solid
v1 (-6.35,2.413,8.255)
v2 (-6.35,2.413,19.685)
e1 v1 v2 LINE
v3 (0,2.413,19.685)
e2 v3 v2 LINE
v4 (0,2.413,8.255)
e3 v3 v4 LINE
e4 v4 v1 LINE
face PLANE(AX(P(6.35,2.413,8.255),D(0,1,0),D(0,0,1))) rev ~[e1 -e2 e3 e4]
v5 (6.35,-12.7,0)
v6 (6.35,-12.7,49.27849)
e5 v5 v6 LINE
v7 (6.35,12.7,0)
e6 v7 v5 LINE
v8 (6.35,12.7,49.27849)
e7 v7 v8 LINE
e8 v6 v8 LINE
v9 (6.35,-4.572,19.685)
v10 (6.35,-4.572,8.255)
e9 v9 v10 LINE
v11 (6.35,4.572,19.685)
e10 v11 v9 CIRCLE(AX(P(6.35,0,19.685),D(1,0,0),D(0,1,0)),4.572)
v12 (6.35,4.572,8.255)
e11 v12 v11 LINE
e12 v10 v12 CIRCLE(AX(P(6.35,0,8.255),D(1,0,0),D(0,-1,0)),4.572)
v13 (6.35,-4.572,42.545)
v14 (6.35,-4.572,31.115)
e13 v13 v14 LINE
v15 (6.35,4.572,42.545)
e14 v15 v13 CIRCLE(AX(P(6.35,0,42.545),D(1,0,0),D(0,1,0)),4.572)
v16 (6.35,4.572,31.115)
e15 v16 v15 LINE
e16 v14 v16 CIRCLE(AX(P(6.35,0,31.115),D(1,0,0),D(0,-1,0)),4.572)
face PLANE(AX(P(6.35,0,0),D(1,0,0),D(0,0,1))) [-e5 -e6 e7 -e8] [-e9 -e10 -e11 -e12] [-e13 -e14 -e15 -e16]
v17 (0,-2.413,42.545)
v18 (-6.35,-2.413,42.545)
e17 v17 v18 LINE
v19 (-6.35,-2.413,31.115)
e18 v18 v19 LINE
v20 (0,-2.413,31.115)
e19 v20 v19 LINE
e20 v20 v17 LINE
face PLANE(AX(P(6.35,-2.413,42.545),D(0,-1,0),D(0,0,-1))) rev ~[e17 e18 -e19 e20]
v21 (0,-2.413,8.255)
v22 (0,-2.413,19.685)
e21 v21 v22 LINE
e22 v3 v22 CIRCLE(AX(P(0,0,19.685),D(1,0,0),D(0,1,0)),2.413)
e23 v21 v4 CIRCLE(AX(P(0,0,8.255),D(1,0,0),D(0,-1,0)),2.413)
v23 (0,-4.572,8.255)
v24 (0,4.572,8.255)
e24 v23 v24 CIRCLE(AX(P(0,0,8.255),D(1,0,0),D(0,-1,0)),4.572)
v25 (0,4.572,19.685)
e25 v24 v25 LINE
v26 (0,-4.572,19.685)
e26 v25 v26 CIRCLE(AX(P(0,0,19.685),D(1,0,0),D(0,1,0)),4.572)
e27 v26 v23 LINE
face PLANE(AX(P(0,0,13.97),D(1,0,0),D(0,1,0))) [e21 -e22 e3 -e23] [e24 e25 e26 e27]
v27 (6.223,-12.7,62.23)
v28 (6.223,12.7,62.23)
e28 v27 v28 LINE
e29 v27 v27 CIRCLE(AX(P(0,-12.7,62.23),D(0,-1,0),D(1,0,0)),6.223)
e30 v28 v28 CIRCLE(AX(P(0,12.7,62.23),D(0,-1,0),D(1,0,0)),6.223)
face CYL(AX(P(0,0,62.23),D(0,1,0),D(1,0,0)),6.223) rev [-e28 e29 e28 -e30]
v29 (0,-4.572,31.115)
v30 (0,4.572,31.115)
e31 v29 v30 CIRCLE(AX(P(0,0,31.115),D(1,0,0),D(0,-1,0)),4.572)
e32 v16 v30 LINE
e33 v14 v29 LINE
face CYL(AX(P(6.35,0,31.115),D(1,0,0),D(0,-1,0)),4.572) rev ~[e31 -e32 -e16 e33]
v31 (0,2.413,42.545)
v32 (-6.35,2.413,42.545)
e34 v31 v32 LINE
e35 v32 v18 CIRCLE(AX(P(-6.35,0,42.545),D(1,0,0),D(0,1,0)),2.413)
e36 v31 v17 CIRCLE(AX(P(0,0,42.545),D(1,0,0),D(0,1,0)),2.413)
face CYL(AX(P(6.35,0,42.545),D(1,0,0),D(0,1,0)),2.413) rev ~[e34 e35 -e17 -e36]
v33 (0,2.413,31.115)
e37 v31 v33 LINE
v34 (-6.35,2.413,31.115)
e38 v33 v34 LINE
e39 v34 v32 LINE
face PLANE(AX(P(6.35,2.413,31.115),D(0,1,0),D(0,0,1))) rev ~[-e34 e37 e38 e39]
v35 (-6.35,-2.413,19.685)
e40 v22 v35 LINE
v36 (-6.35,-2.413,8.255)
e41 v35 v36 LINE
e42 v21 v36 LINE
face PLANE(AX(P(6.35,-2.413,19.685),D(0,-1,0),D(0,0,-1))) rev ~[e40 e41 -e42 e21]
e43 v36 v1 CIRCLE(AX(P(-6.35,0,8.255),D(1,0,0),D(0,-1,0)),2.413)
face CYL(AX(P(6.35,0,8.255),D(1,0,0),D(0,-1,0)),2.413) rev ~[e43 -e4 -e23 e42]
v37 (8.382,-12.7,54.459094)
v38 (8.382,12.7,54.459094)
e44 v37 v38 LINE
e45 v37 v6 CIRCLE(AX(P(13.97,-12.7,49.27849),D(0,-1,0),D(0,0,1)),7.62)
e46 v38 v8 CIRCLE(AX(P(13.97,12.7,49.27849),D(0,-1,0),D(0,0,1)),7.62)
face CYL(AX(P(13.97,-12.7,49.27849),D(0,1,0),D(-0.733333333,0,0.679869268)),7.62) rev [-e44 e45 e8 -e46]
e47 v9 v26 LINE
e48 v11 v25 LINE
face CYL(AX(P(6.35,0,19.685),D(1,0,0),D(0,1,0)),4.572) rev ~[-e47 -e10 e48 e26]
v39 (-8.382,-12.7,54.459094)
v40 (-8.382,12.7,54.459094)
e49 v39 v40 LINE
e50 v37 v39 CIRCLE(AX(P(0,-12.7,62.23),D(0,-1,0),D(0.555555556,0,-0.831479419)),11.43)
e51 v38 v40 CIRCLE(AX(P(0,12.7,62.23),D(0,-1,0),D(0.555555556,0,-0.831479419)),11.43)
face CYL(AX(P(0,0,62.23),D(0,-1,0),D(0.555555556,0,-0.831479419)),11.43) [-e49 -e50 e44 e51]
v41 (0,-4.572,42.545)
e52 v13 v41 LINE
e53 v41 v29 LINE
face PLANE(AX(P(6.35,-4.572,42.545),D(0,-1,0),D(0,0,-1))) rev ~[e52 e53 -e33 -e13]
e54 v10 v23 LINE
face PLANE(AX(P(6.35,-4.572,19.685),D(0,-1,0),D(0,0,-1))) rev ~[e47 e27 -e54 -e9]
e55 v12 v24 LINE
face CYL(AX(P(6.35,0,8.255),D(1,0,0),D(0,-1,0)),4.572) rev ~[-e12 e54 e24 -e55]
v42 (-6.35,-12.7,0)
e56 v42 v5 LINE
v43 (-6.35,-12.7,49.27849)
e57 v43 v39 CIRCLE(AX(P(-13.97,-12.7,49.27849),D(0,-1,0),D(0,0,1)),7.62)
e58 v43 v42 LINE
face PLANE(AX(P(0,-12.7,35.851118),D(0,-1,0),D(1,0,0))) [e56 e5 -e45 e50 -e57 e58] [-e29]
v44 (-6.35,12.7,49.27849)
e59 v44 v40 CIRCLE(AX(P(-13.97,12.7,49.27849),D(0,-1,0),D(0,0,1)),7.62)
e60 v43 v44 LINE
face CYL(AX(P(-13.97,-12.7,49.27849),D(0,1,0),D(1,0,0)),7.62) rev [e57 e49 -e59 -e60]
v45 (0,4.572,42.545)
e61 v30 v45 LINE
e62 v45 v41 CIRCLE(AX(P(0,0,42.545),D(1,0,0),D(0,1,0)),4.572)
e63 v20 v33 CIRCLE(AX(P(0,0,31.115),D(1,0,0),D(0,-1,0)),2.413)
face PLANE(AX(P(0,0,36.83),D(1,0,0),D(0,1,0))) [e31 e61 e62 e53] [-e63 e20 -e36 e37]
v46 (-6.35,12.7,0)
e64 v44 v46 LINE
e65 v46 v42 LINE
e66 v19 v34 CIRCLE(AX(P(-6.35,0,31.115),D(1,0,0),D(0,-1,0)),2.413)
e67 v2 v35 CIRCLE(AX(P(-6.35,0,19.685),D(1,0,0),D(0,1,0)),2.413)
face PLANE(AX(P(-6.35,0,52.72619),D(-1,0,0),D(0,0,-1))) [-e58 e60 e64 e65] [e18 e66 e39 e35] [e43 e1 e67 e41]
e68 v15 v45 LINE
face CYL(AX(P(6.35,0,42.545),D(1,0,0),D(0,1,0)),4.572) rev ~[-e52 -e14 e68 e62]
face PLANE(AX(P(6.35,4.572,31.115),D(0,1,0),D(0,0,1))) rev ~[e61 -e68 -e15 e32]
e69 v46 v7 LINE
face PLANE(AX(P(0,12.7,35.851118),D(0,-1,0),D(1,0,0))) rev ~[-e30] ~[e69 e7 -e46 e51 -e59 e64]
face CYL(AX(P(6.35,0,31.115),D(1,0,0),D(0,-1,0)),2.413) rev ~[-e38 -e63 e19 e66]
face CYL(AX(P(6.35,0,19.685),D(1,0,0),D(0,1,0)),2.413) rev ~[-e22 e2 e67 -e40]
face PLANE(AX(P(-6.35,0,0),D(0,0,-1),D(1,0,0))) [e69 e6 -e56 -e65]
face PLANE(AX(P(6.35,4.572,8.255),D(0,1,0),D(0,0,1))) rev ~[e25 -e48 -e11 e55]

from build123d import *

# Parameters (mm, degrees)
F0_R          = 6.223
F1_DEPTH      = 12.7
F3_R          = 7.62
F2_R          = 2.413
F4_DEPTH      = 17.781
F6_DEPTH      = 17.781
F8_DEPTH      = 6.35
F8_DEPTH_BACK = 5.081


with BuildPart() as f1:
    # F0 (on Front) → F1 (new body, symmetric)
    with BuildSketch(Plane.XZ):
        with BuildLine():
            Line((-6.35, 52.7261902376), (-6.35, 0))
            Line((-6.35, 0), (6.35, 0))
            Line((6.35, 0), (6.35, 52.7261902376))
            ThreePointArc((6.35, 52.7261902376), (0, 73.66), (-6.35, 52.7261902376))
        make_face()
        with Locations((0, 62.23)):
            Circle(F0_R, mode=Mode.SUBTRACT)
    extrude(amount=F1_DEPTH, both=True)

    # F3
    f3_edges = [f1.edges().sort_by_distance(p)[0] for p in [
        (-6.35, 0, 52.72619),
        (6.35, 0, 52.72619),
    ]]
    fillet(f3_edges, radius=F3_R)

    # F2 (on face) → F4 (cut, through all)
    with BuildSketch(Plane.YZ.offset(6.35)):
        with Locations((0, 36.83)):
            Circle(F2_R)
        with Locations((0, 13.97)):
            Circle(F2_R)
    extrude(amount=-F4_DEPTH, mode=Mode.SUBTRACT)

    # F5 (on face) → F6 (cut, through all)
    with BuildSketch(Plane.YZ.offset(6.35)):
        with BuildLine():
            ThreePointArc((2.413, 42.545), (0, 44.958), (-2.413, 42.545))
            Line((-2.413, 42.545), (-2.413, 31.115))
            ThreePointArc((-2.413, 31.115), (0, 28.702), (2.413, 31.115))
            Line((2.413, 31.115), (2.413, 42.545))
        make_face()
        with BuildLine():
            ThreePointArc((2.413, 19.685), (0, 22.098), (-2.413, 19.685))
            Line((-2.413, 19.685), (-2.413, 8.255))
            ThreePointArc((-2.413, 8.255), (0, 5.842), (2.413, 8.255))
            Line((2.413, 8.255), (2.413, 19.685))
        make_face()
    extrude(amount=-F6_DEPTH, mode=Mode.SUBTRACT)

    # F7 (on face) → F8 (cut, two sides)
    with BuildSketch(Plane.YZ.offset(6.35)) as f8_sk:
        with BuildLine():
            Line((4.572, 31.115), (4.572, 42.545))
            ThreePointArc((4.572, 42.545), (0, 47.117), (-4.572, 42.545))
            Line((-4.572, 42.545), (-4.572, 31.115))
            ThreePointArc((-4.572, 31.115), (0, 26.543), (4.572, 31.115))
        make_face()
        with BuildLine():
            Line((4.572, 8.255), (4.572, 19.685))
            ThreePointArc((4.572, 19.685), (0, 24.257), (-4.572, 19.685))
            Line((-4.572, 19.685), (-4.572, 8.255))
            ThreePointArc((-4.572, 8.255), (0, 3.683), (4.572, 8.255))
        make_face()
    extrude(amount=-F8_DEPTH, mode=Mode.SUBTRACT)
    extrude(f8_sk.sketch, amount=F8_DEPTH_BACK, mode=Mode.SUBTRACT)


solid = f1.part
